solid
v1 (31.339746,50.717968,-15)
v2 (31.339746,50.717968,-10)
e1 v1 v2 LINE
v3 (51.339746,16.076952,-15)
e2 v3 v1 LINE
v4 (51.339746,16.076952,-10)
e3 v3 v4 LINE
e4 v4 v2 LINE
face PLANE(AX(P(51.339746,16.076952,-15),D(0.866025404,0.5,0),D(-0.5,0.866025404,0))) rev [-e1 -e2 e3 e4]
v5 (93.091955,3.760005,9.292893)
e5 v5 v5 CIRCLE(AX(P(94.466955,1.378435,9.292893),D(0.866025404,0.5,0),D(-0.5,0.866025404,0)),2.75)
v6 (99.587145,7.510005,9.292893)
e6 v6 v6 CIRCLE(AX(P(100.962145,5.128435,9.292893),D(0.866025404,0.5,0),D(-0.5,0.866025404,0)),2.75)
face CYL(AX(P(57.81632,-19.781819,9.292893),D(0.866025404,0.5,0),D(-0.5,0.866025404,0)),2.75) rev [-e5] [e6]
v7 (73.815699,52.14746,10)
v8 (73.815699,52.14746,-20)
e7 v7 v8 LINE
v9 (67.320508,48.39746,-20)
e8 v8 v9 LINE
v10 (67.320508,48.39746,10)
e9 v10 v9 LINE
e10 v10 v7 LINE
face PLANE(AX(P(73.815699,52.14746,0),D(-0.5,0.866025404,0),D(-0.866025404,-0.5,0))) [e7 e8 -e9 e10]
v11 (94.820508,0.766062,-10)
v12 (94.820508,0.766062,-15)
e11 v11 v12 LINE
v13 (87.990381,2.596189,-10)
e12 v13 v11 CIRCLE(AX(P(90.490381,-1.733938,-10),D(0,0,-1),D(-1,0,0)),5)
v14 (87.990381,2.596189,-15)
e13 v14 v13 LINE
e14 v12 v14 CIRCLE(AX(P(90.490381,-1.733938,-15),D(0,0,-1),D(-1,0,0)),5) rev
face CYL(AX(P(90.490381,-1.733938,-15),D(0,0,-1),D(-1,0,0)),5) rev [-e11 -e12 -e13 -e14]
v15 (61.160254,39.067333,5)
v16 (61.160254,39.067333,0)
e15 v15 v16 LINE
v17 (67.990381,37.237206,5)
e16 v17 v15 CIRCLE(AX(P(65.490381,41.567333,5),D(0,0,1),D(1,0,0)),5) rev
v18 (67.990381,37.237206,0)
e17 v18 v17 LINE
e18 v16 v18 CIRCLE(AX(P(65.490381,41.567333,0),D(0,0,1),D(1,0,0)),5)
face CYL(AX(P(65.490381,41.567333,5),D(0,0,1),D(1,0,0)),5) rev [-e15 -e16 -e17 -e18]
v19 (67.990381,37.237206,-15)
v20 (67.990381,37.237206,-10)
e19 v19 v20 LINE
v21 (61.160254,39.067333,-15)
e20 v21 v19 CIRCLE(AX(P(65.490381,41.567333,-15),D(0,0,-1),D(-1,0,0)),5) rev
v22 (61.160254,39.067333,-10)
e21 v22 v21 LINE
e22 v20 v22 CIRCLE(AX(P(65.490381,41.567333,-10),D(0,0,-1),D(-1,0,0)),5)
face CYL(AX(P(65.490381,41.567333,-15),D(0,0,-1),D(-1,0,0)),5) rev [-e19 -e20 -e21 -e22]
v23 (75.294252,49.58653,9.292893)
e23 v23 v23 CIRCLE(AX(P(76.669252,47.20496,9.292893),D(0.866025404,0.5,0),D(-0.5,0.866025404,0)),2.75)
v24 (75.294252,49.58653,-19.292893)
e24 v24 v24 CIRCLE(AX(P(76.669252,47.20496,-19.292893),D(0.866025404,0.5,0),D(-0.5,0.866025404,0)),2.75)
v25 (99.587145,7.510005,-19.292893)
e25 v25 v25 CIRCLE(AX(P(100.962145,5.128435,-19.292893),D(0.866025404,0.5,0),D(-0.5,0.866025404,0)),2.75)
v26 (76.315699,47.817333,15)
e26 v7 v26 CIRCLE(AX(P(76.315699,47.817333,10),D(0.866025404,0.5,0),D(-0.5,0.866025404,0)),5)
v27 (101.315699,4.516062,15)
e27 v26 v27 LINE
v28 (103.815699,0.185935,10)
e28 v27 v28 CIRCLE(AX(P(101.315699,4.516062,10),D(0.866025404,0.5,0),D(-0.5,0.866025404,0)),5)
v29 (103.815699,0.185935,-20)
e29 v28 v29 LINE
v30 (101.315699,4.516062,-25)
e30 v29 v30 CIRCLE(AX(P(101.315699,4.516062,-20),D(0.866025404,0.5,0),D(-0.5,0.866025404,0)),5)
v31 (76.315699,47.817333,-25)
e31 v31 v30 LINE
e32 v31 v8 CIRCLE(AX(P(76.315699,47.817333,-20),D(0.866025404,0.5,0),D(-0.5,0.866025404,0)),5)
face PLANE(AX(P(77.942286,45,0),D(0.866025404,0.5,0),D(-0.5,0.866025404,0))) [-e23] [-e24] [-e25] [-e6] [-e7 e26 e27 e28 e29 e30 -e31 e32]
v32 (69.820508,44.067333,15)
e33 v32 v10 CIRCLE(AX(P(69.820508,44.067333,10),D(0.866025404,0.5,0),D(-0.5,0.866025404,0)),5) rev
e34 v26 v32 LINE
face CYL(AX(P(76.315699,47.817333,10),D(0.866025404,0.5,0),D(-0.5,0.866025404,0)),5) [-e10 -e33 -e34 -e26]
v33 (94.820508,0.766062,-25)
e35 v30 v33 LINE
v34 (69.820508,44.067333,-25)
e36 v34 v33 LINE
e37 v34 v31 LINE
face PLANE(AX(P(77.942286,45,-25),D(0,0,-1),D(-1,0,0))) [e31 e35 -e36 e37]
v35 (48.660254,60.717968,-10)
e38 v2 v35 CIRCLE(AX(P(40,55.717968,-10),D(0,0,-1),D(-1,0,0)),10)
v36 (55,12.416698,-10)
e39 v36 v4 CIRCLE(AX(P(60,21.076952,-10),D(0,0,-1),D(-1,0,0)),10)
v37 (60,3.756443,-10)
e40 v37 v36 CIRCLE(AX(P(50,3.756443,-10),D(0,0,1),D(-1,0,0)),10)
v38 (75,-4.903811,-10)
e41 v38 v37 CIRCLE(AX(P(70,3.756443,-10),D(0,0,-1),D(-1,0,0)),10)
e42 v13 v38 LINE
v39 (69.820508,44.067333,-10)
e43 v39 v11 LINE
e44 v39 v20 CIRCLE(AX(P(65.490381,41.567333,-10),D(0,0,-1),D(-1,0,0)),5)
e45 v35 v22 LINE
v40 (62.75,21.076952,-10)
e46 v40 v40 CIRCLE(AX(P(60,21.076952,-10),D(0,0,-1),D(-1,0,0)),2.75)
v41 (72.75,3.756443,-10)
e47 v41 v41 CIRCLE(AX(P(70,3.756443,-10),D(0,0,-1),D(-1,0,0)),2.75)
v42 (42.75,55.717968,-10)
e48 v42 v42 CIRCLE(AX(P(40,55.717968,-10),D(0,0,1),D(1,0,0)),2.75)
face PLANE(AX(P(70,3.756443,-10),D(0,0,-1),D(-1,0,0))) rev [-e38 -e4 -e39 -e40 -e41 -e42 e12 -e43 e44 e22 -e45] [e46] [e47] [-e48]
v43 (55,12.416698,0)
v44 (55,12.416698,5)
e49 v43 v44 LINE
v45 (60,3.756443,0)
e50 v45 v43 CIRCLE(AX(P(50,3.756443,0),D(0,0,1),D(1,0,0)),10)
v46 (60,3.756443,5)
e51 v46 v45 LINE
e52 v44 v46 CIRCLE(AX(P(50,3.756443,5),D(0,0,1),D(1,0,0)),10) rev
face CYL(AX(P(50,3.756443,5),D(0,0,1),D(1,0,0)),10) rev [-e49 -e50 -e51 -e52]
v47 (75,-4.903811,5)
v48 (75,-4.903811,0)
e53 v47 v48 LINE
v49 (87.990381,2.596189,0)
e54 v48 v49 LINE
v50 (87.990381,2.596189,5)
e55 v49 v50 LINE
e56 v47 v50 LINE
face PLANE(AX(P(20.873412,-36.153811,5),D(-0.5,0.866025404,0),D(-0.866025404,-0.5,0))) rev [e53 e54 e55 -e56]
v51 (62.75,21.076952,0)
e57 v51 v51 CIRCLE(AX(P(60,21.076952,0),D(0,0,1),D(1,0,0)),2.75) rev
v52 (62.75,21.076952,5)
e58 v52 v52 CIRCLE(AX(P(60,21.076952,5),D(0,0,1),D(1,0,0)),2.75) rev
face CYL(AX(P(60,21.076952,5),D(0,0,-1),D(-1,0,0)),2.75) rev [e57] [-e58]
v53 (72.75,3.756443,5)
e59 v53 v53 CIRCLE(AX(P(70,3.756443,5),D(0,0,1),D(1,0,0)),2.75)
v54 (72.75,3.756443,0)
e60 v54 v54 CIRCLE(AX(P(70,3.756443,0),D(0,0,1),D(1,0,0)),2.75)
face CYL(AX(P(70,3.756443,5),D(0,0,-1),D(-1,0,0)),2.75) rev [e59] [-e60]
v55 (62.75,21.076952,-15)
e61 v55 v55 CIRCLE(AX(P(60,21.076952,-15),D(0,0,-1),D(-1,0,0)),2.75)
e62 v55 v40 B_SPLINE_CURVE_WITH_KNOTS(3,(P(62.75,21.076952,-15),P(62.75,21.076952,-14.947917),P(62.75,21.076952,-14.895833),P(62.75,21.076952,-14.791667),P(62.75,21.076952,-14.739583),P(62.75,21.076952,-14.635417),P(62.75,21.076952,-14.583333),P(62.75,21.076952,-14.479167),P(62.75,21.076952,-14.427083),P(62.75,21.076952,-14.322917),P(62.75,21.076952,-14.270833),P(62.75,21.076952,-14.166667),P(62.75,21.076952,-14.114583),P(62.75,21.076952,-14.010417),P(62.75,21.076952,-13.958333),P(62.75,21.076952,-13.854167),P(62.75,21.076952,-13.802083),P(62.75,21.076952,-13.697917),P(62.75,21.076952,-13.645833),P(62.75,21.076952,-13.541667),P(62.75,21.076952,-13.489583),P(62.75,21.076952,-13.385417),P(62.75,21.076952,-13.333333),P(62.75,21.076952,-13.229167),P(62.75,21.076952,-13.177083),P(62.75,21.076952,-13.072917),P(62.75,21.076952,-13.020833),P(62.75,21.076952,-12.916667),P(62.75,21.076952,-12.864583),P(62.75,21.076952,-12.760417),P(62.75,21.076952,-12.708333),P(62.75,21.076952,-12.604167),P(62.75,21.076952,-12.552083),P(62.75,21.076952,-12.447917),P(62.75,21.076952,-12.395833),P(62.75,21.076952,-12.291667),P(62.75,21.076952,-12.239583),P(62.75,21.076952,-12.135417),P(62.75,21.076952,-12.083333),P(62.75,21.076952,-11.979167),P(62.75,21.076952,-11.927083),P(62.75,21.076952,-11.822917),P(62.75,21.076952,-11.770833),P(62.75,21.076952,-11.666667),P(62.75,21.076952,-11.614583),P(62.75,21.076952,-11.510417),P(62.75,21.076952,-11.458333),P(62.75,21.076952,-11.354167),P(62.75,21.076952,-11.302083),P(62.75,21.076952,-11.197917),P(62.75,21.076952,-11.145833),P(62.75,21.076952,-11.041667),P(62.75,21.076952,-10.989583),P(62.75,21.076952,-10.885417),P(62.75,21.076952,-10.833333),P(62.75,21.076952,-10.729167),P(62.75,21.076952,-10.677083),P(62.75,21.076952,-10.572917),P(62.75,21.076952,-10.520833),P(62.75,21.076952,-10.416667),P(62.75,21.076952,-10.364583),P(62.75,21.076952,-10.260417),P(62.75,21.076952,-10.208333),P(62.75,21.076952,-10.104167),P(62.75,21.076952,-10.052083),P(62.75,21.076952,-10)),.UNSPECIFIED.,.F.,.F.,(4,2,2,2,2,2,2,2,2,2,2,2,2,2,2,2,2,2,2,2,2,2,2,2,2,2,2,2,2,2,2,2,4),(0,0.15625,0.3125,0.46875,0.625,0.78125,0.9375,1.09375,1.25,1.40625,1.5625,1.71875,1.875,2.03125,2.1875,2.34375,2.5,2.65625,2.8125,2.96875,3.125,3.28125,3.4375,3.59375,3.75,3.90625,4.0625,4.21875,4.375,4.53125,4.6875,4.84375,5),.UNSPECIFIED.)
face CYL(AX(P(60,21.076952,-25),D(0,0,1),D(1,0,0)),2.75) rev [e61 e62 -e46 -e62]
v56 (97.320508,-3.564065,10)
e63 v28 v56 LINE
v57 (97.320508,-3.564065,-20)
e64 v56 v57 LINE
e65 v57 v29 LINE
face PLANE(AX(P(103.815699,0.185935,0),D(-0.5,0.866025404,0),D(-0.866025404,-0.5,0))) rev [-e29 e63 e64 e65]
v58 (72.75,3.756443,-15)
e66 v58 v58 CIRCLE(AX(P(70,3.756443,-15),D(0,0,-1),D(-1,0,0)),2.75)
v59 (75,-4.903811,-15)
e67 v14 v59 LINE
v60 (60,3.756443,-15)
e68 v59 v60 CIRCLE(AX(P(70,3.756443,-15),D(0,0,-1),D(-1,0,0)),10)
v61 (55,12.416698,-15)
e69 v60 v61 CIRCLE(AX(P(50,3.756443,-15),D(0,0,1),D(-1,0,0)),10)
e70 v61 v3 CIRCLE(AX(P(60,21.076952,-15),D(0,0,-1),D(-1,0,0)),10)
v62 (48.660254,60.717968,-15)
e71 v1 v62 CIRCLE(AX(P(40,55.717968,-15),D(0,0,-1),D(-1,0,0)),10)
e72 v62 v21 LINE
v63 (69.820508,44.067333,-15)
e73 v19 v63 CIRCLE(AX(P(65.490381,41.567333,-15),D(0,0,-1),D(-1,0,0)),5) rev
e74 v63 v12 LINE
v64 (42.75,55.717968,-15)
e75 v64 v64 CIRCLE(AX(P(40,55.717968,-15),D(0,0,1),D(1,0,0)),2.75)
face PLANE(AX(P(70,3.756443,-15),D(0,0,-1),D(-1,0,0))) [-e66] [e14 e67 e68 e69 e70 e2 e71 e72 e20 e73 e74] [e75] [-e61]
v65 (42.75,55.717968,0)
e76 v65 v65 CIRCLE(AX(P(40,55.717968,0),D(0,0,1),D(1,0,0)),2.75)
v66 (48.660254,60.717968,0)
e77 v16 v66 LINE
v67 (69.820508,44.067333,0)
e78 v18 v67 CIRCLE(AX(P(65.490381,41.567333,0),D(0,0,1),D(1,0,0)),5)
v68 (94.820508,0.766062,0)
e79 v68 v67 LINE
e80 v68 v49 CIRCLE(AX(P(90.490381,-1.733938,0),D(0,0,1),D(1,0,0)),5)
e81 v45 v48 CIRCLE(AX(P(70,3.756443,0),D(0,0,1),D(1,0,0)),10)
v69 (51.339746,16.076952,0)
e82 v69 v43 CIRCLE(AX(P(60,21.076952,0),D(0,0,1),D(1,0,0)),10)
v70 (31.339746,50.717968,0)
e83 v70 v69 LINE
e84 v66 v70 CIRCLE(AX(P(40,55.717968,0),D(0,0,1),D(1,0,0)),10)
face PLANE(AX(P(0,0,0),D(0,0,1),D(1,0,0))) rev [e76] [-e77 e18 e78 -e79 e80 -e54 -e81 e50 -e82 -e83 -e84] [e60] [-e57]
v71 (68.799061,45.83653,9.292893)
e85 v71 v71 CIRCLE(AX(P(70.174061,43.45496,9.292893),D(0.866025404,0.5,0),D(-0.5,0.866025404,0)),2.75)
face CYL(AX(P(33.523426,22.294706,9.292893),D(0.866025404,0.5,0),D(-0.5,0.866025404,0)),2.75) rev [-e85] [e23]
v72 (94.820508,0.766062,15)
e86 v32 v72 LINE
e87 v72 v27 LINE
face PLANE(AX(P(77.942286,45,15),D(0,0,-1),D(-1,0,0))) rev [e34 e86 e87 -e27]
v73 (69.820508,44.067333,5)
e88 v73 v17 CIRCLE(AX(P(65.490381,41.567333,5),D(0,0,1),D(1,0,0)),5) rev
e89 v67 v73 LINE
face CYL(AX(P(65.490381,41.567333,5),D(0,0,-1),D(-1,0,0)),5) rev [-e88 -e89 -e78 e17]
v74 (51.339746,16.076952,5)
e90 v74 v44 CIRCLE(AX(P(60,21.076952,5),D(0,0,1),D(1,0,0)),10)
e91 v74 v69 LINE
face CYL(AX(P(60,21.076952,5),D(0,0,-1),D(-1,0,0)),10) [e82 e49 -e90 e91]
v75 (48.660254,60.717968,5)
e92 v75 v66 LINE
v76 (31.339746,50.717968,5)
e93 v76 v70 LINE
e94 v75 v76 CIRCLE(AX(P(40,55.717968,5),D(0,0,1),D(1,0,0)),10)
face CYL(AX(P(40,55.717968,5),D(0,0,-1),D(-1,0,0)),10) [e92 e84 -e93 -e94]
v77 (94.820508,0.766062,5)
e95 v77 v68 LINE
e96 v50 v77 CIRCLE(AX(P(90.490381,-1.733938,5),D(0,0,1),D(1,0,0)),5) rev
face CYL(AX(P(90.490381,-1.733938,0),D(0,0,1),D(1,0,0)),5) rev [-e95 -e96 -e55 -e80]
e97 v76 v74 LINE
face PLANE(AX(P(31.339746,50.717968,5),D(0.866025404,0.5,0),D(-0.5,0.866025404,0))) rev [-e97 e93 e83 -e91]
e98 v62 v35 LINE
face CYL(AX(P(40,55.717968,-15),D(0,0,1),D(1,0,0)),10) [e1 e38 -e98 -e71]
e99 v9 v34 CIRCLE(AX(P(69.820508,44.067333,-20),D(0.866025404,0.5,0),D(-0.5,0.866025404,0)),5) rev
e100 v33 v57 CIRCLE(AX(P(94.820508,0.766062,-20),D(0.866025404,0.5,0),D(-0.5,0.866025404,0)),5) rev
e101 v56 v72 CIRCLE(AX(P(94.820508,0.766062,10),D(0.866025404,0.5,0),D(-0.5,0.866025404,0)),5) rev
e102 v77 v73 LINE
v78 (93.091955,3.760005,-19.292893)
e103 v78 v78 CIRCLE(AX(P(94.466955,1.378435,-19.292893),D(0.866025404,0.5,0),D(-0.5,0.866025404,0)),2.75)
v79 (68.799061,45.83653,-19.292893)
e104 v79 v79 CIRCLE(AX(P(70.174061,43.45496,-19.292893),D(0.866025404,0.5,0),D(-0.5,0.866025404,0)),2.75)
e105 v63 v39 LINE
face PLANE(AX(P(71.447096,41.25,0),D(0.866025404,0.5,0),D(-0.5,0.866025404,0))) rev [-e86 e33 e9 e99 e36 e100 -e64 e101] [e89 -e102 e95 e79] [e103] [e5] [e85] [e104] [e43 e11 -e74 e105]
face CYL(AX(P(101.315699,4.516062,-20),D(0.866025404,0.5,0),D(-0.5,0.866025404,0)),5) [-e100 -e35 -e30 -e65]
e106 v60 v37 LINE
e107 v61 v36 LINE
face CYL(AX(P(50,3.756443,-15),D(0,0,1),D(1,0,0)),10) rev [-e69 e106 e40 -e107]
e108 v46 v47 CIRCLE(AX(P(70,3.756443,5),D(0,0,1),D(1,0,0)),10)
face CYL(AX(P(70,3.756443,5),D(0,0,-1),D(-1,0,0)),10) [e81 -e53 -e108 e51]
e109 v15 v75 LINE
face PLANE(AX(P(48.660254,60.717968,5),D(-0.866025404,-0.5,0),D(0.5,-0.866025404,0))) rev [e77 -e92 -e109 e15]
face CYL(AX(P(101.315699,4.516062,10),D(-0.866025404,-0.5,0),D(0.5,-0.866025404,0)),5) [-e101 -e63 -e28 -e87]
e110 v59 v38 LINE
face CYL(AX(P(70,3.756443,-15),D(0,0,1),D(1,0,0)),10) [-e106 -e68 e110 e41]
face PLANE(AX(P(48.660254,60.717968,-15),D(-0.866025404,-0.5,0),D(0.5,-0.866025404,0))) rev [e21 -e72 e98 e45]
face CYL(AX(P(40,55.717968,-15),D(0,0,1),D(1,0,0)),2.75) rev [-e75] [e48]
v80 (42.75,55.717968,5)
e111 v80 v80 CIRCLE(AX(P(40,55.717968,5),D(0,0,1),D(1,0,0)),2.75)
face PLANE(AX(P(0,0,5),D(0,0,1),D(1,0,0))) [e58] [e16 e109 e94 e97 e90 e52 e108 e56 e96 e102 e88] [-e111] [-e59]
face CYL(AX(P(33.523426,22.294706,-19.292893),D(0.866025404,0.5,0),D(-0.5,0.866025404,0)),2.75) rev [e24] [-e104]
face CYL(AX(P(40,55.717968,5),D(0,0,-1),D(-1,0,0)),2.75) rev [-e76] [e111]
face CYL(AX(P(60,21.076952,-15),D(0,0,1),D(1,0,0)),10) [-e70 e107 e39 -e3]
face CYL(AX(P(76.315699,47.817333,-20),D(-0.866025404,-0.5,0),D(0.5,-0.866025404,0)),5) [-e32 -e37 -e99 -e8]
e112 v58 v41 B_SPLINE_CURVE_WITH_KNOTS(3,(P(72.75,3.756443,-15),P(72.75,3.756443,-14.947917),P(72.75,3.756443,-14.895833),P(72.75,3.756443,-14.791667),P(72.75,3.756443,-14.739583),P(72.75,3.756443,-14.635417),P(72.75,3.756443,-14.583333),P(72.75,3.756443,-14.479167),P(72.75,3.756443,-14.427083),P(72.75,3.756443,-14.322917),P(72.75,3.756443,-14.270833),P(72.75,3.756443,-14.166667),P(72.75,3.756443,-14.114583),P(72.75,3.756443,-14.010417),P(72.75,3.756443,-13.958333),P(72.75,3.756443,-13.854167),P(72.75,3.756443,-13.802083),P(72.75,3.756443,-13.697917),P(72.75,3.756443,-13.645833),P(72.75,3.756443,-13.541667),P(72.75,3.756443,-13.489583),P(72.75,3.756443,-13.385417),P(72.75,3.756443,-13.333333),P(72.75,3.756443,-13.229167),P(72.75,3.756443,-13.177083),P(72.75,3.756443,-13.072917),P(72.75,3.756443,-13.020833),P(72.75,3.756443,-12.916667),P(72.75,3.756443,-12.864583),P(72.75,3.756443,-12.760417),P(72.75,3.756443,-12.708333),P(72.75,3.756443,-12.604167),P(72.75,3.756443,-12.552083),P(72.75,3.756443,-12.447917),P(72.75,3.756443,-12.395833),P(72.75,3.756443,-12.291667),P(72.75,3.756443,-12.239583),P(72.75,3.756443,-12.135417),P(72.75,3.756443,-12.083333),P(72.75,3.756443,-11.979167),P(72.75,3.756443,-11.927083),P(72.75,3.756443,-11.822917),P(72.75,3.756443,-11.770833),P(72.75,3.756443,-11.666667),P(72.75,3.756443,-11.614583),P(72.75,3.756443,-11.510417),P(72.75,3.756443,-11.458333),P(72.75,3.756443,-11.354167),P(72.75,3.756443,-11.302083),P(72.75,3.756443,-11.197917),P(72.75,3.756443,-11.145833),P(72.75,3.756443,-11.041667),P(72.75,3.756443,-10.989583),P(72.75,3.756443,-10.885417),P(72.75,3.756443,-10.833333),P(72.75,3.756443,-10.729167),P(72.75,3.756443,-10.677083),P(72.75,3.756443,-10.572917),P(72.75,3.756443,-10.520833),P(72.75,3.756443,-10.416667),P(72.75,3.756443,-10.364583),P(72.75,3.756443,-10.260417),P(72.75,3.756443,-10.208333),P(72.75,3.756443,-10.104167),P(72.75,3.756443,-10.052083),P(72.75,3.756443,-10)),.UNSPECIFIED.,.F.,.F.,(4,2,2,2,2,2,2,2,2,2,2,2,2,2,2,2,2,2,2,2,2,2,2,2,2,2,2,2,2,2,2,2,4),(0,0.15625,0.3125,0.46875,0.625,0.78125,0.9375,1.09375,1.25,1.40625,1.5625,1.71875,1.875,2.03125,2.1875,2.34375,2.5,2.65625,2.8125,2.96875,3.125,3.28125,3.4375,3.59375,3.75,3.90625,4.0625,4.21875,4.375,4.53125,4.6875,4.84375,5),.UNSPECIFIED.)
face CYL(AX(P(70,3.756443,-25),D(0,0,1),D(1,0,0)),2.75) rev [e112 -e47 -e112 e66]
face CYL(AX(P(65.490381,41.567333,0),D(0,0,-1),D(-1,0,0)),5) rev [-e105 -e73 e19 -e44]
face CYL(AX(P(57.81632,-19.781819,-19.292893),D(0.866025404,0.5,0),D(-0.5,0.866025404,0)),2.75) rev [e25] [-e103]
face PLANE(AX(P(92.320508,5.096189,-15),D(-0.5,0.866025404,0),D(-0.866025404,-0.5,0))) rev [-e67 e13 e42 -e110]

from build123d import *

# Parameters (mm, degrees)
SKETCH7_R               = 2.75
BOSS_EXTRUDE5_DEPTH     = 5
FILLET4_R               = 10
SKETCH8_R               = 2.75
BOSS_EXTRUDE6_DEPTH     = 5
SKETCH9_W               = 10
SKETCH9_H               = 10
SKETCH9_H_2             = 40
SKETCH9_W_2             = 5
BOSS_EXTRUDE7_DEPTH     = 7.5
FILLET5_R               = 5
SKETCH10_R              = 2.75
CUT_EXTRUDE3_DEPTH      = 64.495460213
SKETCH11_R              = 2.75
BOSS_EXTRUDE8_DEPTH     = 5
BOSS_EXTRUDE9_DEPTH     = 5
FILLET6_R               = 5
CUT_EXTRUDE4_START      = -5
SKETCH13_R              = 2.75
CUT_EXTRUDE4_DEPTH      = 5
CUT_EXTRUDE5_DEPTH      = 127.477470595
CUT_EXTRUDE5_DEPTH_BACK = 127.477470595
SKETCH14_R              = 2.75


with BuildPart() as part:
    # Sketch7 → Boss-Extrude5 (new body)
    with BuildSketch(Plane.XY):
        with BuildLine():
            Line((72.320508076, 39.737205584), (55, 29.737205584))
            ThreePointArc((55, 29.737205584), (51.339745962, 16.076951546), (65, 12.416697508))
            ThreePointArc((65, 12.416697508), (61.339745962, -1.24355653), (75, -4.903810568))
            Line((75, -4.903810568), (92.320508076, 5.096189432))
            Line((92.320508076, 5.096189432), (72.320508076, 39.737205584))
        make_face()
        with Locations((70, 3.75644347)):
            Circle(SKETCH7_R, mode=Mode.SUBTRACT)
        with Locations((60, 21.076951546)):
            Circle(SKETCH7_R, mode=Mode.SUBTRACT)
    extrude(amount=BOSS_EXTRUDE5_DEPTH)

    # Fillet4
    fillet4_edges = [part.edges().sort_by_distance(p)[0] for p in [
        (65, 12.416697508, 2.5),
    ]]
    fillet(fillet4_edges, radius=FILLET4_R)



with BuildPart() as body_2:
    # Sketch8 → Boss-Extrude6 (new body)
    with BuildSketch(Plane(origin=(0, 0, -10), x_dir=(-1, 0, 0), z_dir=(0, 0, -1))):
        with BuildLine():
            Line((-55, 29.737205584), (-72.320508076, 39.737205584))
            Line((-72.320508076, 39.737205584), (-92.320508076, 5.096189432))
            Line((-92.320508076, 5.096189432), (-75, -4.903810568))
            ThreePointArc((-75, -4.903810568), (-65, -4.903810568), (-60, 3.75644347))
            ThreePointArc((-60, 3.75644347), (-58.660254038, 8.75644347), (-55, 12.416697508))
            ThreePointArc((-55, 12.416697508), (-50, 21.076951546), (-55, 29.737205584))
        make_face()
        with Locations(Location((-70, 3.75644347, 0), (0, 0, 180))):
            Circle(SKETCH8_R, mode=Mode.SUBTRACT)
        with Locations(Location((-60, 21.076951546, 0), (0, 0, 180))):
            Circle(SKETCH8_R, mode=Mode.SUBTRACT)
    extrude(amount=BOSS_EXTRUDE6_DEPTH)


with BuildPart() as part_1:
    add(part.part)

    add(body_2.part)  # Boss-Extrude7 merges body 2
    # Sketch9 → Boss-Extrude7 (add)
    with BuildSketch(Plane(origin=(71.447095812, 41.25, 0), x_dir=(0, 0, -1), z_dir=(0.8660254037844416, 0.4999999999999949, 0))):
        with Locations((5, 3.253175473)):
            Rectangle(SKETCH9_W, SKETCH9_H)
        Polygon((0, 8.253175473), (-15, 8.253175473), (-15, -51.746824527), (25, -51.746824527), (25, 8.253175473), (10, 8.253175473), (10, -1.746824527), (15, -1.746824527), (15, -41.746824527), (10, -41.746824527), (0, -41.746824527), (-5, -41.746824527), (-5, -1.746824527), (0, -1.746824527), align=None)
        with Locations((5, -21.746824527)):
            Rectangle(SKETCH9_W, SKETCH9_H_2)
        with Locations((12.5, -21.746824527)):
            Rectangle(SKETCH9_W_2, SKETCH9_H_2)
        with Locations((-2.5, -21.746824527)):
            Rectangle(SKETCH9_W_2, SKETCH9_H_2)
    extrude(amount=BOSS_EXTRUDE7_DEPTH)

    # Fillet5
    fillet5_edges = [part_1.edges().sort_by_distance(p)[0] for p in [
        (70.56810334, 50.272459622, -25),
        (70.56810334, 50.272459622, 15),
        (100.56810334, -1.689064606, 15),
        (100.56810334, -1.689064606, -25),
    ]]
    fillet(fillet5_edges, radius=FILLET5_R)

    # Sketch10 → Cut-Extrude3 (cut, through all)
    with BuildSketch(Plane(origin=(77.942286341, 45, 0), x_dir=(0, 0, -1), z_dir=(0.8660254037844415, 0.4999999999999951, 0))):
        with Locations(Location((-9.292893219, 2.546068692, 0), (0, 0, 90))):
            Circle(SKETCH10_R)
        with Locations(Location((19.292893219, 2.546068692, 0), (0, 0, 90))):
            Circle(SKETCH10_R)
        with Locations(Location((19.292893219, -46.039717746, 0), (0, 0, 90))):
            Circle(SKETCH10_R)
        with Locations(Location((-9.292893219, -46.039717746, 0), (0, 0, 90))):
            Circle(SKETCH10_R)
    extrude(amount=-CUT_EXTRUDE3_DEPTH, mode=Mode.SUBTRACT)

    # Sketch11 → Boss-Extrude8 (add)
    with BuildSketch(Plane.XY):
        with BuildLine():
            Line((48.660254038, 60.717967697), (68.660254038, 26.076951546))
            ThreePointArc((68.660254038, 26.076951546), (65, 12.416697508), (51.339745962, 16.076951546))
            Line((51.339745962, 16.076951546), (31.339745962, 50.717967697))
            ThreePointArc((31.339745962, 50.717967697), (35, 64.378221735), (48.660254038, 60.717967697))
        make_face()
        with Locations((40, 55.717967697)):
            Circle(SKETCH11_R, mode=Mode.SUBTRACT)
        with Locations((60, 21.076951546)):
            Circle(SKETCH11_R, mode=Mode.SUBTRACT)
    extrude(amount=BOSS_EXTRUDE8_DEPTH)

    # Sketch12 → Boss-Extrude9 (add)
    with BuildSketch(Plane(origin=(0, 0, -10), x_dir=(-1, 0, 0), z_dir=(0, 0, -1))):
        with BuildLine():
            Line((-48.660254038, 60.717967697), (-63.660254038, 34.737205584))
            Line((-63.660254038, 34.737205584), (-72.320508076, 39.737205584))
            Line((-72.320508076, 39.737205584), (-92.320508076, 5.096189432))
            Line((-92.320508076, 5.096189432), (-75, -4.903810568))
            ThreePointArc((-75, -4.903810568), (-65, -4.903810568), (-60, 3.75644347))
            ThreePointArc((-60, 3.75644347), (-58.660254038, 8.75644347), (-55, 12.416697508))
            ThreePointArc((-55, 12.416697508), (-52.928932188, 14.005883734), (-51.339745962, 16.076951546))
            Line((-51.339745962, 16.076951546), (-31.339745962, 50.717967697))
            ThreePointArc((-31.339745962, 50.717967697), (-35, 64.378221735), (-48.660254038, 60.717967697))
        make_face()
    extrude(amount=BOSS_EXTRUDE9_DEPTH)

    # Fillet6
    fillet6_edges = [part_1.edges().sort_by_distance(p)[0] for p in [
        (92.320508076, 5.096189432, -12.5),
        (92.320508076, 5.096189432, 2.5),
        (72.320508076, 39.737205584, -12.5),
        (72.320508076, 39.737205584, 2.5),
        (63.660254038, 34.737205584, -12.5),
        (63.660254038, 34.737205584, 2.5),
    ]]
    fillet(fillet6_edges, radius=FILLET6_R - 0.0001)  # a hair under: the kernel refuses the full size

    # Sketch13 → Cut-Extrude4 (cut)
    with BuildSketch(Plane.XY.offset(-10).offset(CUT_EXTRUDE4_START)):
        with Locations((40, 55.717967697)):
            Circle(SKETCH13_R)
    extrude(amount=CUT_EXTRUDE4_DEPTH, mode=Mode.SUBTRACT)

    # Sketch14 → Cut-Extrude5 (cut, two sides: drawn at the far end of the back side and taken through both)
    with BuildSketch(Plane.XY.offset(5).offset(-CUT_EXTRUDE5_DEPTH_BACK)):
        with Locations((60, 21.076951546)):
            Circle(SKETCH14_R)
        with Locations((70, 3.75644347)):
            Circle(SKETCH14_R)
    extrude(amount=CUT_EXTRUDE5_DEPTH + CUT_EXTRUDE5_DEPTH_BACK, mode=Mode.SUBTRACT)


solid = part_1.part
